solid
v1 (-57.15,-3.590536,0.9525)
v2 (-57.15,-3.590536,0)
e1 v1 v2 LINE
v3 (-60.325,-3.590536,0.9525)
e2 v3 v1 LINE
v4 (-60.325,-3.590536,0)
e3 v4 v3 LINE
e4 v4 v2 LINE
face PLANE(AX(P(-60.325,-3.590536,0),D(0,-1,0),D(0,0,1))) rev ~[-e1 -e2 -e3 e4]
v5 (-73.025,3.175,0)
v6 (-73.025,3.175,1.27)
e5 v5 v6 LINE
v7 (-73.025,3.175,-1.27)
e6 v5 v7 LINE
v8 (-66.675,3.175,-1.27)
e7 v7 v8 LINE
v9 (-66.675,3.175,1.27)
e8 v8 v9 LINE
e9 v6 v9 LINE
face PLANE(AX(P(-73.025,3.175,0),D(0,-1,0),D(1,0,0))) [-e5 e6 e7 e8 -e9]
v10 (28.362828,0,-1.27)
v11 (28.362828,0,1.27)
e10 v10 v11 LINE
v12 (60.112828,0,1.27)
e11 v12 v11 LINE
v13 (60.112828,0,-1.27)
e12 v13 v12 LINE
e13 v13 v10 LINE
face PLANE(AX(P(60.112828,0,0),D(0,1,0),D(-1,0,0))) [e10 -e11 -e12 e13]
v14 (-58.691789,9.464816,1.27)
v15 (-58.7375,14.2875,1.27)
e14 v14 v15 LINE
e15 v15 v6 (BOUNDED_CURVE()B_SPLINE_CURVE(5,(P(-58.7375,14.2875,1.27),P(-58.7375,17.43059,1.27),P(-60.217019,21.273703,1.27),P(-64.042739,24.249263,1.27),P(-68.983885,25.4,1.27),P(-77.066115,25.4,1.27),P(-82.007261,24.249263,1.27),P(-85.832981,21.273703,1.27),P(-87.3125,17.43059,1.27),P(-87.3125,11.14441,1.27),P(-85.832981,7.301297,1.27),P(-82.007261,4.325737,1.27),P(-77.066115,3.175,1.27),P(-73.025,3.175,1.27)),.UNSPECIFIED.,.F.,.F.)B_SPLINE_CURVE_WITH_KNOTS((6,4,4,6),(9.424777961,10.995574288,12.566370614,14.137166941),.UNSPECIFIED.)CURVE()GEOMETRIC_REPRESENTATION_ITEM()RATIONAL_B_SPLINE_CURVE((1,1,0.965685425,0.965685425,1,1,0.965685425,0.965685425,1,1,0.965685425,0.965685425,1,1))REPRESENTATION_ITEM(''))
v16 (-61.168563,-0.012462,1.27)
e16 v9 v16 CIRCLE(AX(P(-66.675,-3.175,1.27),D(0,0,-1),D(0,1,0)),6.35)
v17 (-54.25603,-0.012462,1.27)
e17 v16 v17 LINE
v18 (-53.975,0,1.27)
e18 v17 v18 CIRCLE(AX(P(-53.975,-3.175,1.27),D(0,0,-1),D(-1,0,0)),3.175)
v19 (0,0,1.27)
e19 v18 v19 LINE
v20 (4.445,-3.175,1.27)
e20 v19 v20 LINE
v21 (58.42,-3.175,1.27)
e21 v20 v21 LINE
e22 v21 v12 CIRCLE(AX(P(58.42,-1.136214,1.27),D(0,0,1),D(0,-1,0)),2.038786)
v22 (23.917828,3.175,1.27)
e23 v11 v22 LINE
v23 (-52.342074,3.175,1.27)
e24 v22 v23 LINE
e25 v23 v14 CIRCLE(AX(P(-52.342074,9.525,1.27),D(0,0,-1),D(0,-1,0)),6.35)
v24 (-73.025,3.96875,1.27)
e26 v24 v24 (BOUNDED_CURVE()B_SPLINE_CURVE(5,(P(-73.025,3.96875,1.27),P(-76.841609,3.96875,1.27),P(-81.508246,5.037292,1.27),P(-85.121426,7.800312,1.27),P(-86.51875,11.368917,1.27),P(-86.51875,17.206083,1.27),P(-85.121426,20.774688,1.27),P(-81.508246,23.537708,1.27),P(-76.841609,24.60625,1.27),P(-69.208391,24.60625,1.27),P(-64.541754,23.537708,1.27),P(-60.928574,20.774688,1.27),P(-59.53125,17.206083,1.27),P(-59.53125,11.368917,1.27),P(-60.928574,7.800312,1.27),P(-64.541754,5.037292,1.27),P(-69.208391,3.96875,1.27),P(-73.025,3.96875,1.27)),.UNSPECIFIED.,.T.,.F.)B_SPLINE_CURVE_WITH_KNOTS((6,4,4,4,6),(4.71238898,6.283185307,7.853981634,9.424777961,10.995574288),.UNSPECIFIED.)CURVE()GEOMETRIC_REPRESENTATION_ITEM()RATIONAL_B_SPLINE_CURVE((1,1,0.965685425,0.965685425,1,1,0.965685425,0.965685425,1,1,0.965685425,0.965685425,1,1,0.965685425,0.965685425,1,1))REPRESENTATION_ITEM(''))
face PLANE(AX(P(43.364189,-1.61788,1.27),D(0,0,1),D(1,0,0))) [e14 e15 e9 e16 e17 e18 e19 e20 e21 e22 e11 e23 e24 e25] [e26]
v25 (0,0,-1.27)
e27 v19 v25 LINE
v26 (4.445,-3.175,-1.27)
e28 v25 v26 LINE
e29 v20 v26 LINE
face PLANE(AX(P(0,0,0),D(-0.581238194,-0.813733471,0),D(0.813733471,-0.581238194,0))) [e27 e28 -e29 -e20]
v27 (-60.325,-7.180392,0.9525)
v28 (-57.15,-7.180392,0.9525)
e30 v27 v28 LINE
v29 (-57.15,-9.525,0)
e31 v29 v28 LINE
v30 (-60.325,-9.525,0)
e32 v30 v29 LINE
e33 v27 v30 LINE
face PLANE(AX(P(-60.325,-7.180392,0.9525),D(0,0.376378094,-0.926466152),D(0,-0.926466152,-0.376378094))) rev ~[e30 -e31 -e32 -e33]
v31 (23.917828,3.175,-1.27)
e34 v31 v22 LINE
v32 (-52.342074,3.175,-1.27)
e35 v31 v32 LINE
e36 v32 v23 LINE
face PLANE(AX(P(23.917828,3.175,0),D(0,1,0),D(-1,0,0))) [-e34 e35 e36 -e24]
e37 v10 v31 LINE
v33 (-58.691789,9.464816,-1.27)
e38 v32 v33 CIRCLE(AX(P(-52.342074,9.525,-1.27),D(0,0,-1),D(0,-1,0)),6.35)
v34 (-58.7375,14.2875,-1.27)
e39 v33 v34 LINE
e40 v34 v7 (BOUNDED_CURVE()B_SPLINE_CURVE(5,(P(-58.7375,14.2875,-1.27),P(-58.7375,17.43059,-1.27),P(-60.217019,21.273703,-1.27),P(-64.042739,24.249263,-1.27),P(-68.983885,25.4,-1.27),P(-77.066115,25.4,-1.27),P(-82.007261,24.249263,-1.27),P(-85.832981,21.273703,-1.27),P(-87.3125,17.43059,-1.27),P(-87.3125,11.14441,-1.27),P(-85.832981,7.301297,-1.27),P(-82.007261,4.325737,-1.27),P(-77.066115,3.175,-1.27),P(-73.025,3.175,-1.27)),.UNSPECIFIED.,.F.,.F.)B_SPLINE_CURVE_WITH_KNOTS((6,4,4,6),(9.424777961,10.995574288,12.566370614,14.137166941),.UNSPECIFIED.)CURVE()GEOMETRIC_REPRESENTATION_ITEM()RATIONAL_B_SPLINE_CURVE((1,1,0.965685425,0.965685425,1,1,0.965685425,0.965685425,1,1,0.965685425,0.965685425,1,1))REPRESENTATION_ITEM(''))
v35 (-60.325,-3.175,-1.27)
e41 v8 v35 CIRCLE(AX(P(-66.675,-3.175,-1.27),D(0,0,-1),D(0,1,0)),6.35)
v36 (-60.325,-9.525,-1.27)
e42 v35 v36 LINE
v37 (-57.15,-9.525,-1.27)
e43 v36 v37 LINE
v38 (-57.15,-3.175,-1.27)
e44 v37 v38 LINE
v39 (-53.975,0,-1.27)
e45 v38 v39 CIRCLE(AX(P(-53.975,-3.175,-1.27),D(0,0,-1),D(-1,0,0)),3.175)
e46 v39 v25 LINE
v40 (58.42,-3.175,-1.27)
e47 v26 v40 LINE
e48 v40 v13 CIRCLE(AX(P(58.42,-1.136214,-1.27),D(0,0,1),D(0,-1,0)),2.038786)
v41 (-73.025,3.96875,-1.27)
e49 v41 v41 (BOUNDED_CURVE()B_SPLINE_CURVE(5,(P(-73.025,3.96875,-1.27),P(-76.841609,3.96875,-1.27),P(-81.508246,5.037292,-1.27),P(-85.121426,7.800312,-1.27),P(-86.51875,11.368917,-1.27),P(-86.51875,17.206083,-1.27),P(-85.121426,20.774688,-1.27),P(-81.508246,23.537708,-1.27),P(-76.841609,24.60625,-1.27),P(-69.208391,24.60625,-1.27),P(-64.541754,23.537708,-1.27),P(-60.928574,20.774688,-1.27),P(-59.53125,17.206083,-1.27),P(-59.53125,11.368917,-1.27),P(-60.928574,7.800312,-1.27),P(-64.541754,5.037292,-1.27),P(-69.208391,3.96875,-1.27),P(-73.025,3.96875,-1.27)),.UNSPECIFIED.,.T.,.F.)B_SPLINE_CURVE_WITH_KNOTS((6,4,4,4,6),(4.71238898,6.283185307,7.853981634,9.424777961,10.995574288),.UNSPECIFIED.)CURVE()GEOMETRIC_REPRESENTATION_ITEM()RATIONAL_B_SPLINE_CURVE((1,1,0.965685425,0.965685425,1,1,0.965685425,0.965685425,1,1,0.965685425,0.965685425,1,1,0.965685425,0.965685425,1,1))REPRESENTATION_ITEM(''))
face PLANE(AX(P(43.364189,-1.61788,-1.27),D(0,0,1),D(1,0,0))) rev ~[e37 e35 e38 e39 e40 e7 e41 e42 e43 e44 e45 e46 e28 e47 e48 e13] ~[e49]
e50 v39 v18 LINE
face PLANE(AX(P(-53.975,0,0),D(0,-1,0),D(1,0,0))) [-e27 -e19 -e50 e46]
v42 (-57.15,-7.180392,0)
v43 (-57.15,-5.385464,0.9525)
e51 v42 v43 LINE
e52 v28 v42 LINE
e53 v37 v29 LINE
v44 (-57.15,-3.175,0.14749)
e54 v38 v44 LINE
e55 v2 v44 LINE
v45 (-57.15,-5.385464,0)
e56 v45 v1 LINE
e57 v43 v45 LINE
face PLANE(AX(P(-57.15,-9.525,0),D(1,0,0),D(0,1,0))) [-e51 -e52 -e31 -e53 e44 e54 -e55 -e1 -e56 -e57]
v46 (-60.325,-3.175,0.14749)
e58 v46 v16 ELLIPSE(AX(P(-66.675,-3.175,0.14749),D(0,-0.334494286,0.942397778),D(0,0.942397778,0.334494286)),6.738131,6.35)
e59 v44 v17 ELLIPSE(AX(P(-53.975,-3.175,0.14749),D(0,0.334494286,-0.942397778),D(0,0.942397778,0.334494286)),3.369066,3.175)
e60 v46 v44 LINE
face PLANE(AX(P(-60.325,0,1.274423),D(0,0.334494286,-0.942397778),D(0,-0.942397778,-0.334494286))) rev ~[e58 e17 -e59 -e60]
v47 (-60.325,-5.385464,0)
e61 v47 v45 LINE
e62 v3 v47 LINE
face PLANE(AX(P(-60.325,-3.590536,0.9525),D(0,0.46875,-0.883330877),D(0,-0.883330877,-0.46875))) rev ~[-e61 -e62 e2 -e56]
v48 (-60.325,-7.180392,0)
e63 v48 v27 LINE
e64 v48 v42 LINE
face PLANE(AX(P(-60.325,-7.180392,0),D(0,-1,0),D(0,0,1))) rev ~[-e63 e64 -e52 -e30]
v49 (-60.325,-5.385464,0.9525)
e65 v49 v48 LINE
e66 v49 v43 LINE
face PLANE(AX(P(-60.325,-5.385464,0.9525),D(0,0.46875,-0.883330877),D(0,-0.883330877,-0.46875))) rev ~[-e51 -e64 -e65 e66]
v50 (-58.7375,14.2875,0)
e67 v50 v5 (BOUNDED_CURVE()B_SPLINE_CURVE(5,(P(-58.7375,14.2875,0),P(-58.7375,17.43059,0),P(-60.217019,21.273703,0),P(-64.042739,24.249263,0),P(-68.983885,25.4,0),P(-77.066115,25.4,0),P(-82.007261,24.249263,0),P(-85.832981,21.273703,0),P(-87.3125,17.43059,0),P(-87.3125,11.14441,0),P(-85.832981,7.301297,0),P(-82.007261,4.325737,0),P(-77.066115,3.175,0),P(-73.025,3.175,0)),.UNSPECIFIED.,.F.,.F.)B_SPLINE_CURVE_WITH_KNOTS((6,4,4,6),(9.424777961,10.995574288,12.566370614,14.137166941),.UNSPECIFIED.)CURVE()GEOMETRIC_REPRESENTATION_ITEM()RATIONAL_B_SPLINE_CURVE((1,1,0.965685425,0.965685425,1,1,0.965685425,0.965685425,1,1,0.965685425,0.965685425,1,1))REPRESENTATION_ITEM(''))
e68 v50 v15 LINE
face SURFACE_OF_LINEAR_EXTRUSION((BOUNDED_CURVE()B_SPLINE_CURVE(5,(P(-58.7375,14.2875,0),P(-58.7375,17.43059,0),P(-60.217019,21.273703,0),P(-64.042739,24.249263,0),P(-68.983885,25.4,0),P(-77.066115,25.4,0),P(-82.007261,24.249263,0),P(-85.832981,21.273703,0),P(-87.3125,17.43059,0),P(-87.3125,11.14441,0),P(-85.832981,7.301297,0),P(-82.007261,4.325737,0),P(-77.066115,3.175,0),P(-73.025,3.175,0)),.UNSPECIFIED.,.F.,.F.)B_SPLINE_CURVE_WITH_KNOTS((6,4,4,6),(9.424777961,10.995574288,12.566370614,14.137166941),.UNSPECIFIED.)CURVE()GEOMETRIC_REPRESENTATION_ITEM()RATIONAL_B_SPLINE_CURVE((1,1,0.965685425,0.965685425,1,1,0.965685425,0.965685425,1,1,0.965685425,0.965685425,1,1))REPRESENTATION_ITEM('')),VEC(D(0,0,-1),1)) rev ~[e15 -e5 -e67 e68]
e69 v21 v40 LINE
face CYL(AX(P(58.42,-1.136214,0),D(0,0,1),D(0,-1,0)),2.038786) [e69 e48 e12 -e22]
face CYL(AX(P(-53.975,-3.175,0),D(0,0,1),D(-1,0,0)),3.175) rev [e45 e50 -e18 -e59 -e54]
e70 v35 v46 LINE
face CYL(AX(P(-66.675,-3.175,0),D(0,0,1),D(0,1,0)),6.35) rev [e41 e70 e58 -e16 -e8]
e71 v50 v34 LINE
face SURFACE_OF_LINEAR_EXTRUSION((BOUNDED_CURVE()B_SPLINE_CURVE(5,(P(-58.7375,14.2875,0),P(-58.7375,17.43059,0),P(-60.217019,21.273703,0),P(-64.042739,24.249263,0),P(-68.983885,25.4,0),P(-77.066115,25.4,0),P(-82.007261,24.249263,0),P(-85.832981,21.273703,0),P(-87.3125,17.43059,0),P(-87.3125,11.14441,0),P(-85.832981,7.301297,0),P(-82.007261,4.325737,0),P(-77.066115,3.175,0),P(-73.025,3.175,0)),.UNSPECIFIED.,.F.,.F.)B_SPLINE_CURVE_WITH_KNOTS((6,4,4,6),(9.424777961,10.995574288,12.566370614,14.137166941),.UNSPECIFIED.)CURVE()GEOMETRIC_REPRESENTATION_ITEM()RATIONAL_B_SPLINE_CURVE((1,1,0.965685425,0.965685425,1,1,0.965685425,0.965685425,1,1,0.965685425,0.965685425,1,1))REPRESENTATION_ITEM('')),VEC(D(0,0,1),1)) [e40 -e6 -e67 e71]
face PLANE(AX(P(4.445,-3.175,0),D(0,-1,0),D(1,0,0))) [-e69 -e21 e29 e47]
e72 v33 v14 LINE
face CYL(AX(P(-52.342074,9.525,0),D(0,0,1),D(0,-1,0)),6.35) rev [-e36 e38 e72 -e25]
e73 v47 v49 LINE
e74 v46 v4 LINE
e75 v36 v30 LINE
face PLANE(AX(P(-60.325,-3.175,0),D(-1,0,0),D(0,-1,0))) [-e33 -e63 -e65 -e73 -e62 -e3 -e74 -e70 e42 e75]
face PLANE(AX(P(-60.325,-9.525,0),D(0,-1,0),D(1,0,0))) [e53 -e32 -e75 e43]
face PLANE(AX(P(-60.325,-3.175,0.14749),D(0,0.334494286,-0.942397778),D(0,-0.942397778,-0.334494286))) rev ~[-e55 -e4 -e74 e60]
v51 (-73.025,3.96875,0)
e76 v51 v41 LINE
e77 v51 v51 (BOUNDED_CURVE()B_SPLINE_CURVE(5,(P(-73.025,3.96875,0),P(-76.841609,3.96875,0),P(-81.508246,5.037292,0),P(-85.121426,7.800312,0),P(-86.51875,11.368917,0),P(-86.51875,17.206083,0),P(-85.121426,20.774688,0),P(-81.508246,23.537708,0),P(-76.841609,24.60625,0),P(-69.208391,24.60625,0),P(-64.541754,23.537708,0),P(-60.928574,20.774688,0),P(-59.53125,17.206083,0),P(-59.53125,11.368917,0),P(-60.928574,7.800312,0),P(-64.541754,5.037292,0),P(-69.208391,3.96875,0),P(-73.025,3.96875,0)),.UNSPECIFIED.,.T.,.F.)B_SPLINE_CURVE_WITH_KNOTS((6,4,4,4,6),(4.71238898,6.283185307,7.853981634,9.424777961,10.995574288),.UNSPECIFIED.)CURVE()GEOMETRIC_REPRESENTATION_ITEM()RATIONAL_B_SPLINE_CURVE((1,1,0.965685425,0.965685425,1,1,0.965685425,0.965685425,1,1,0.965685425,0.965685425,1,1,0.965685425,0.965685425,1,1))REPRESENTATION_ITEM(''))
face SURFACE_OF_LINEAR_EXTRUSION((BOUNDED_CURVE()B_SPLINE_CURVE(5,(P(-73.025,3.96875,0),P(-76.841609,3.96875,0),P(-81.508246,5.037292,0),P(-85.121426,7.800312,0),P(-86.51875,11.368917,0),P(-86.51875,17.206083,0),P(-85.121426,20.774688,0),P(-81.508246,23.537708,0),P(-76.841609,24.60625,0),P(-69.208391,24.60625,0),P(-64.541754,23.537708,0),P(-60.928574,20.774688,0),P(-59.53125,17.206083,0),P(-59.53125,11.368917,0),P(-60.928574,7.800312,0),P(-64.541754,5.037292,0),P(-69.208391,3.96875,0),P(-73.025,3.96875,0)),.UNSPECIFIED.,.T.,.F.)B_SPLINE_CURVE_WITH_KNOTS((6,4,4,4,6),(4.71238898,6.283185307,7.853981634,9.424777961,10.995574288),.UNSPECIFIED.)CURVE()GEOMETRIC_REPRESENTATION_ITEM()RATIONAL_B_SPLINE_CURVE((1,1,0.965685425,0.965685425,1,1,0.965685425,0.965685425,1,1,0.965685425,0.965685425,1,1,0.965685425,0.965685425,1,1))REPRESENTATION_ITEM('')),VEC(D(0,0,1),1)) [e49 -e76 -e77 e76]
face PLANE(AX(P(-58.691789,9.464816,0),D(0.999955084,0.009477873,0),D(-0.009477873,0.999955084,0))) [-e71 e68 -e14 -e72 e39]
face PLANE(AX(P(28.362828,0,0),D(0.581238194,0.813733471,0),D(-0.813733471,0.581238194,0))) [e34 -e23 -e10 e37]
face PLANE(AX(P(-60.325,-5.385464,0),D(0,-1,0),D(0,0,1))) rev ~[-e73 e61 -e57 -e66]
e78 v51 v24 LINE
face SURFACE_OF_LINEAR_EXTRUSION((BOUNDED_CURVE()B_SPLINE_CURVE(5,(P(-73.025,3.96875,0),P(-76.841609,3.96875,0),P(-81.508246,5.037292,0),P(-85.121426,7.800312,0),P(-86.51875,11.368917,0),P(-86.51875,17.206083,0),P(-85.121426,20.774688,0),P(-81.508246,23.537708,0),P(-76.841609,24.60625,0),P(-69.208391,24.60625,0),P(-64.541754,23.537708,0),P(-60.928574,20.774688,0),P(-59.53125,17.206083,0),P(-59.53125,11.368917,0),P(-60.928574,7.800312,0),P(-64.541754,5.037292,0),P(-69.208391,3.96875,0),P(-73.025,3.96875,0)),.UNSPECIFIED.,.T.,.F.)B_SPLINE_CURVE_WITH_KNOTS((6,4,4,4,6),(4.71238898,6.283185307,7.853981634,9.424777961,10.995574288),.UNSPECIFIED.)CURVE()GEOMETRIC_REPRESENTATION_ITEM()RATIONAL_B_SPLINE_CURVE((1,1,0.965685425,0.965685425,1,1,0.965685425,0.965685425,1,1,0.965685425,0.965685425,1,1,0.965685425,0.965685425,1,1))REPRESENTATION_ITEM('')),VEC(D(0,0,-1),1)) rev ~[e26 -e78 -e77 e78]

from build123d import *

# Parameters (mm, degrees)
F1_DEPTH      = 1.27
F1_DEPTH_BACK = 1.27
F3_DEPTH      = 6.0699698694
F4_DEPTH      = 26.9885001


# Not quite as in the source:
# - a feature names something its author has since deleted; it is built from what else it names


with BuildPart() as f1:
    # F0 (on Top) → F1 (new body, two sides)
    with BuildSketch(Plane.XY) as f1_sk:
        with BuildLine():
            Line((28.36282759, 0), (26.0949704471, -3.175))
            Line((26.0949704471, -3.175), (58.42, -3.175))
            ThreePointArc((58.42, -3.175), (60.2190476821, -2.0954196621), (60.11282759, 0))
            Line((60.11282759, 0), (28.36282759, 0))
        make_face()
        Polygon((-1.27, 0), (0, 0), (4.445, -3.175), (26.0949704471, -3.175), (28.36282759, 0), (23.91782759, 0), (23.91782759, 3.175), (0, 3.175), align=None)
        Polygon((28.36282759, 0), (23.91782759, 3.175), (23.91782759, 0), align=None)
        with BuildLine():
            add(Edge.make_bspline(
                [(-73.025, 3.175), (-58.7375, 3.175), (-58.7375, 14.2875)],
                knots=[1.5707963268, 1.5707963268, 1.5707963268, 3.1415926536, 3.1415926536, 3.1415926536], degree=2, weights=[1, 0.7071067812, 1]))
            add(Edge.make_bspline(
                [(-58.7375, 14.2875), (-58.7375, 25.4), (-73.025, 25.4)],
                knots=[3.1415926536, 3.1415926536, 3.1415926536, 4.7123889804, 4.7123889804, 4.7123889804], degree=2, weights=[1, 0.7071067812, 1]))
            Line((-73.025, 25.4), (-73.025, 24.60625))
            add(Edge.make_bspline(
                [(-73.025, 3.96875), (-59.53125, 3.96875), (-59.53125, 14.2875), (-59.53125, 24.60625), (-73.025, 24.60625)],
                knots=[1.5707963268, 1.5707963268, 1.5707963268, 3.1415926536, 3.1415926536, 4.7123889804, 4.7123889804, 4.7123889804], degree=2, weights=[1, 0.7071067812, 1, 0.7071067812, 1]))
            Line((-73.025, 3.96875), (-73.025, 3.175))
        make_face()
        with BuildLine():
            add(Edge.make_bspline(
                [(-73.025, 25.4), (-87.3125, 25.4), (-87.3125, 14.2875), (-87.3125, 3.175), (-73.025, 3.175)],
                knots=[4.7123889804, 4.7123889804, 4.7123889804, 6.2831853072, 6.2831853072, 7.853981634, 7.853981634, 7.853981634], degree=2, weights=[1, 0.7071067812, 1, 0.7071067812, 1]))
            Line((-73.025, 3.175), (-73.025, 3.96875))
            add(Edge.make_bspline(
                [(-73.025, 24.60625), (-86.51875, 24.60625), (-86.51875, 14.2875), (-86.51875, 3.96875), (-73.025, 3.96875)],
                knots=[4.7123889804, 4.7123889804, 4.7123889804, 6.2831853072, 6.2831853072, 7.853981634, 7.853981634, 7.853981634], degree=2, weights=[1, 0.7071067812, 1, 0.7071067812, 1]))
            Line((-73.025, 24.60625), (-73.025, 25.4))
        make_face()
        with BuildLine():
            Line((-53.975, 0), (-1.27, 0))
            Line((-1.27, 0), (0, 3.175))
            Line((0, 3.175), (-52.3420743746, 3.175))
            ThreePointArc((-52.3420743746, 3.175), (-56.8108733454, 5.0136436897), (-58.6917891577, 9.4648155091))
            Line((-58.6917891577, 9.4648155091), (-58.7375, 14.2875))
            add(Edge.make_bspline(
                [(-73.025, 3.175), (-58.7375, 3.175), (-58.7375, 14.2875)],
                knots=[1.5707963268, 1.5707963268, 1.5707963268, 3.1415926536, 3.1415926536, 3.1415926536], degree=2, weights=[1, 0.7071067812, 1]))
            Line((-73.025, 3.175), (-66.675, 3.175))
            ThreePointArc((-66.675, 3.175), (-62.1848719395, 1.3151280605), (-60.325, -3.175))
            Line((-60.325, -3.175), (-60.325, -9.525))
            Line((-60.325, -9.525), (-57.15, -9.525))
            Line((-57.15, -9.525), (-57.15, -3.175))
            ThreePointArc((-57.15, -3.175), (-56.2200640303, -0.9299359697), (-53.975, 0))
        make_face()
    extrude(amount=F1_DEPTH)
    extrude(f1_sk.sketch, amount=-F1_DEPTH_BACK)

    # F2 (on face) → F3 (cut, through all)
    with BuildSketch(Plane(origin=(-60.325, 0, 0), x_dir=(0, -1, 0), z_dir=(-1, 0, 0))):
        Polygon((3.175, 1.27), (3.175, 0.1474900148), (3.590535535, 0), (3.590535535, 0.9525), (5.3854638761, 0), (5.3854638761, 0.9525), (7.1803922173, 0), (7.1803922173, 0.9525), (9.525, 0), (9.525, 1.27), align=None)
        Polygon((9.525, 1.27), (0, 1.2744232312), (3.175, 0.1474900148), (3.175, 1.27), align=None)
    extrude(amount=-F3_DEPTH, mode=Mode.SUBTRACT)

    # F4 (cut, through all): a face of the model
    f4_faces = [f1.faces().sort_by_distance(p)[0] for p in [
        (-60.325, -2.1208206422, 0.8958300049),
    ]]
    extrude(f4_faces, amount=-F4_DEPTH, mode=Mode.SUBTRACT)


solid = f1.part
